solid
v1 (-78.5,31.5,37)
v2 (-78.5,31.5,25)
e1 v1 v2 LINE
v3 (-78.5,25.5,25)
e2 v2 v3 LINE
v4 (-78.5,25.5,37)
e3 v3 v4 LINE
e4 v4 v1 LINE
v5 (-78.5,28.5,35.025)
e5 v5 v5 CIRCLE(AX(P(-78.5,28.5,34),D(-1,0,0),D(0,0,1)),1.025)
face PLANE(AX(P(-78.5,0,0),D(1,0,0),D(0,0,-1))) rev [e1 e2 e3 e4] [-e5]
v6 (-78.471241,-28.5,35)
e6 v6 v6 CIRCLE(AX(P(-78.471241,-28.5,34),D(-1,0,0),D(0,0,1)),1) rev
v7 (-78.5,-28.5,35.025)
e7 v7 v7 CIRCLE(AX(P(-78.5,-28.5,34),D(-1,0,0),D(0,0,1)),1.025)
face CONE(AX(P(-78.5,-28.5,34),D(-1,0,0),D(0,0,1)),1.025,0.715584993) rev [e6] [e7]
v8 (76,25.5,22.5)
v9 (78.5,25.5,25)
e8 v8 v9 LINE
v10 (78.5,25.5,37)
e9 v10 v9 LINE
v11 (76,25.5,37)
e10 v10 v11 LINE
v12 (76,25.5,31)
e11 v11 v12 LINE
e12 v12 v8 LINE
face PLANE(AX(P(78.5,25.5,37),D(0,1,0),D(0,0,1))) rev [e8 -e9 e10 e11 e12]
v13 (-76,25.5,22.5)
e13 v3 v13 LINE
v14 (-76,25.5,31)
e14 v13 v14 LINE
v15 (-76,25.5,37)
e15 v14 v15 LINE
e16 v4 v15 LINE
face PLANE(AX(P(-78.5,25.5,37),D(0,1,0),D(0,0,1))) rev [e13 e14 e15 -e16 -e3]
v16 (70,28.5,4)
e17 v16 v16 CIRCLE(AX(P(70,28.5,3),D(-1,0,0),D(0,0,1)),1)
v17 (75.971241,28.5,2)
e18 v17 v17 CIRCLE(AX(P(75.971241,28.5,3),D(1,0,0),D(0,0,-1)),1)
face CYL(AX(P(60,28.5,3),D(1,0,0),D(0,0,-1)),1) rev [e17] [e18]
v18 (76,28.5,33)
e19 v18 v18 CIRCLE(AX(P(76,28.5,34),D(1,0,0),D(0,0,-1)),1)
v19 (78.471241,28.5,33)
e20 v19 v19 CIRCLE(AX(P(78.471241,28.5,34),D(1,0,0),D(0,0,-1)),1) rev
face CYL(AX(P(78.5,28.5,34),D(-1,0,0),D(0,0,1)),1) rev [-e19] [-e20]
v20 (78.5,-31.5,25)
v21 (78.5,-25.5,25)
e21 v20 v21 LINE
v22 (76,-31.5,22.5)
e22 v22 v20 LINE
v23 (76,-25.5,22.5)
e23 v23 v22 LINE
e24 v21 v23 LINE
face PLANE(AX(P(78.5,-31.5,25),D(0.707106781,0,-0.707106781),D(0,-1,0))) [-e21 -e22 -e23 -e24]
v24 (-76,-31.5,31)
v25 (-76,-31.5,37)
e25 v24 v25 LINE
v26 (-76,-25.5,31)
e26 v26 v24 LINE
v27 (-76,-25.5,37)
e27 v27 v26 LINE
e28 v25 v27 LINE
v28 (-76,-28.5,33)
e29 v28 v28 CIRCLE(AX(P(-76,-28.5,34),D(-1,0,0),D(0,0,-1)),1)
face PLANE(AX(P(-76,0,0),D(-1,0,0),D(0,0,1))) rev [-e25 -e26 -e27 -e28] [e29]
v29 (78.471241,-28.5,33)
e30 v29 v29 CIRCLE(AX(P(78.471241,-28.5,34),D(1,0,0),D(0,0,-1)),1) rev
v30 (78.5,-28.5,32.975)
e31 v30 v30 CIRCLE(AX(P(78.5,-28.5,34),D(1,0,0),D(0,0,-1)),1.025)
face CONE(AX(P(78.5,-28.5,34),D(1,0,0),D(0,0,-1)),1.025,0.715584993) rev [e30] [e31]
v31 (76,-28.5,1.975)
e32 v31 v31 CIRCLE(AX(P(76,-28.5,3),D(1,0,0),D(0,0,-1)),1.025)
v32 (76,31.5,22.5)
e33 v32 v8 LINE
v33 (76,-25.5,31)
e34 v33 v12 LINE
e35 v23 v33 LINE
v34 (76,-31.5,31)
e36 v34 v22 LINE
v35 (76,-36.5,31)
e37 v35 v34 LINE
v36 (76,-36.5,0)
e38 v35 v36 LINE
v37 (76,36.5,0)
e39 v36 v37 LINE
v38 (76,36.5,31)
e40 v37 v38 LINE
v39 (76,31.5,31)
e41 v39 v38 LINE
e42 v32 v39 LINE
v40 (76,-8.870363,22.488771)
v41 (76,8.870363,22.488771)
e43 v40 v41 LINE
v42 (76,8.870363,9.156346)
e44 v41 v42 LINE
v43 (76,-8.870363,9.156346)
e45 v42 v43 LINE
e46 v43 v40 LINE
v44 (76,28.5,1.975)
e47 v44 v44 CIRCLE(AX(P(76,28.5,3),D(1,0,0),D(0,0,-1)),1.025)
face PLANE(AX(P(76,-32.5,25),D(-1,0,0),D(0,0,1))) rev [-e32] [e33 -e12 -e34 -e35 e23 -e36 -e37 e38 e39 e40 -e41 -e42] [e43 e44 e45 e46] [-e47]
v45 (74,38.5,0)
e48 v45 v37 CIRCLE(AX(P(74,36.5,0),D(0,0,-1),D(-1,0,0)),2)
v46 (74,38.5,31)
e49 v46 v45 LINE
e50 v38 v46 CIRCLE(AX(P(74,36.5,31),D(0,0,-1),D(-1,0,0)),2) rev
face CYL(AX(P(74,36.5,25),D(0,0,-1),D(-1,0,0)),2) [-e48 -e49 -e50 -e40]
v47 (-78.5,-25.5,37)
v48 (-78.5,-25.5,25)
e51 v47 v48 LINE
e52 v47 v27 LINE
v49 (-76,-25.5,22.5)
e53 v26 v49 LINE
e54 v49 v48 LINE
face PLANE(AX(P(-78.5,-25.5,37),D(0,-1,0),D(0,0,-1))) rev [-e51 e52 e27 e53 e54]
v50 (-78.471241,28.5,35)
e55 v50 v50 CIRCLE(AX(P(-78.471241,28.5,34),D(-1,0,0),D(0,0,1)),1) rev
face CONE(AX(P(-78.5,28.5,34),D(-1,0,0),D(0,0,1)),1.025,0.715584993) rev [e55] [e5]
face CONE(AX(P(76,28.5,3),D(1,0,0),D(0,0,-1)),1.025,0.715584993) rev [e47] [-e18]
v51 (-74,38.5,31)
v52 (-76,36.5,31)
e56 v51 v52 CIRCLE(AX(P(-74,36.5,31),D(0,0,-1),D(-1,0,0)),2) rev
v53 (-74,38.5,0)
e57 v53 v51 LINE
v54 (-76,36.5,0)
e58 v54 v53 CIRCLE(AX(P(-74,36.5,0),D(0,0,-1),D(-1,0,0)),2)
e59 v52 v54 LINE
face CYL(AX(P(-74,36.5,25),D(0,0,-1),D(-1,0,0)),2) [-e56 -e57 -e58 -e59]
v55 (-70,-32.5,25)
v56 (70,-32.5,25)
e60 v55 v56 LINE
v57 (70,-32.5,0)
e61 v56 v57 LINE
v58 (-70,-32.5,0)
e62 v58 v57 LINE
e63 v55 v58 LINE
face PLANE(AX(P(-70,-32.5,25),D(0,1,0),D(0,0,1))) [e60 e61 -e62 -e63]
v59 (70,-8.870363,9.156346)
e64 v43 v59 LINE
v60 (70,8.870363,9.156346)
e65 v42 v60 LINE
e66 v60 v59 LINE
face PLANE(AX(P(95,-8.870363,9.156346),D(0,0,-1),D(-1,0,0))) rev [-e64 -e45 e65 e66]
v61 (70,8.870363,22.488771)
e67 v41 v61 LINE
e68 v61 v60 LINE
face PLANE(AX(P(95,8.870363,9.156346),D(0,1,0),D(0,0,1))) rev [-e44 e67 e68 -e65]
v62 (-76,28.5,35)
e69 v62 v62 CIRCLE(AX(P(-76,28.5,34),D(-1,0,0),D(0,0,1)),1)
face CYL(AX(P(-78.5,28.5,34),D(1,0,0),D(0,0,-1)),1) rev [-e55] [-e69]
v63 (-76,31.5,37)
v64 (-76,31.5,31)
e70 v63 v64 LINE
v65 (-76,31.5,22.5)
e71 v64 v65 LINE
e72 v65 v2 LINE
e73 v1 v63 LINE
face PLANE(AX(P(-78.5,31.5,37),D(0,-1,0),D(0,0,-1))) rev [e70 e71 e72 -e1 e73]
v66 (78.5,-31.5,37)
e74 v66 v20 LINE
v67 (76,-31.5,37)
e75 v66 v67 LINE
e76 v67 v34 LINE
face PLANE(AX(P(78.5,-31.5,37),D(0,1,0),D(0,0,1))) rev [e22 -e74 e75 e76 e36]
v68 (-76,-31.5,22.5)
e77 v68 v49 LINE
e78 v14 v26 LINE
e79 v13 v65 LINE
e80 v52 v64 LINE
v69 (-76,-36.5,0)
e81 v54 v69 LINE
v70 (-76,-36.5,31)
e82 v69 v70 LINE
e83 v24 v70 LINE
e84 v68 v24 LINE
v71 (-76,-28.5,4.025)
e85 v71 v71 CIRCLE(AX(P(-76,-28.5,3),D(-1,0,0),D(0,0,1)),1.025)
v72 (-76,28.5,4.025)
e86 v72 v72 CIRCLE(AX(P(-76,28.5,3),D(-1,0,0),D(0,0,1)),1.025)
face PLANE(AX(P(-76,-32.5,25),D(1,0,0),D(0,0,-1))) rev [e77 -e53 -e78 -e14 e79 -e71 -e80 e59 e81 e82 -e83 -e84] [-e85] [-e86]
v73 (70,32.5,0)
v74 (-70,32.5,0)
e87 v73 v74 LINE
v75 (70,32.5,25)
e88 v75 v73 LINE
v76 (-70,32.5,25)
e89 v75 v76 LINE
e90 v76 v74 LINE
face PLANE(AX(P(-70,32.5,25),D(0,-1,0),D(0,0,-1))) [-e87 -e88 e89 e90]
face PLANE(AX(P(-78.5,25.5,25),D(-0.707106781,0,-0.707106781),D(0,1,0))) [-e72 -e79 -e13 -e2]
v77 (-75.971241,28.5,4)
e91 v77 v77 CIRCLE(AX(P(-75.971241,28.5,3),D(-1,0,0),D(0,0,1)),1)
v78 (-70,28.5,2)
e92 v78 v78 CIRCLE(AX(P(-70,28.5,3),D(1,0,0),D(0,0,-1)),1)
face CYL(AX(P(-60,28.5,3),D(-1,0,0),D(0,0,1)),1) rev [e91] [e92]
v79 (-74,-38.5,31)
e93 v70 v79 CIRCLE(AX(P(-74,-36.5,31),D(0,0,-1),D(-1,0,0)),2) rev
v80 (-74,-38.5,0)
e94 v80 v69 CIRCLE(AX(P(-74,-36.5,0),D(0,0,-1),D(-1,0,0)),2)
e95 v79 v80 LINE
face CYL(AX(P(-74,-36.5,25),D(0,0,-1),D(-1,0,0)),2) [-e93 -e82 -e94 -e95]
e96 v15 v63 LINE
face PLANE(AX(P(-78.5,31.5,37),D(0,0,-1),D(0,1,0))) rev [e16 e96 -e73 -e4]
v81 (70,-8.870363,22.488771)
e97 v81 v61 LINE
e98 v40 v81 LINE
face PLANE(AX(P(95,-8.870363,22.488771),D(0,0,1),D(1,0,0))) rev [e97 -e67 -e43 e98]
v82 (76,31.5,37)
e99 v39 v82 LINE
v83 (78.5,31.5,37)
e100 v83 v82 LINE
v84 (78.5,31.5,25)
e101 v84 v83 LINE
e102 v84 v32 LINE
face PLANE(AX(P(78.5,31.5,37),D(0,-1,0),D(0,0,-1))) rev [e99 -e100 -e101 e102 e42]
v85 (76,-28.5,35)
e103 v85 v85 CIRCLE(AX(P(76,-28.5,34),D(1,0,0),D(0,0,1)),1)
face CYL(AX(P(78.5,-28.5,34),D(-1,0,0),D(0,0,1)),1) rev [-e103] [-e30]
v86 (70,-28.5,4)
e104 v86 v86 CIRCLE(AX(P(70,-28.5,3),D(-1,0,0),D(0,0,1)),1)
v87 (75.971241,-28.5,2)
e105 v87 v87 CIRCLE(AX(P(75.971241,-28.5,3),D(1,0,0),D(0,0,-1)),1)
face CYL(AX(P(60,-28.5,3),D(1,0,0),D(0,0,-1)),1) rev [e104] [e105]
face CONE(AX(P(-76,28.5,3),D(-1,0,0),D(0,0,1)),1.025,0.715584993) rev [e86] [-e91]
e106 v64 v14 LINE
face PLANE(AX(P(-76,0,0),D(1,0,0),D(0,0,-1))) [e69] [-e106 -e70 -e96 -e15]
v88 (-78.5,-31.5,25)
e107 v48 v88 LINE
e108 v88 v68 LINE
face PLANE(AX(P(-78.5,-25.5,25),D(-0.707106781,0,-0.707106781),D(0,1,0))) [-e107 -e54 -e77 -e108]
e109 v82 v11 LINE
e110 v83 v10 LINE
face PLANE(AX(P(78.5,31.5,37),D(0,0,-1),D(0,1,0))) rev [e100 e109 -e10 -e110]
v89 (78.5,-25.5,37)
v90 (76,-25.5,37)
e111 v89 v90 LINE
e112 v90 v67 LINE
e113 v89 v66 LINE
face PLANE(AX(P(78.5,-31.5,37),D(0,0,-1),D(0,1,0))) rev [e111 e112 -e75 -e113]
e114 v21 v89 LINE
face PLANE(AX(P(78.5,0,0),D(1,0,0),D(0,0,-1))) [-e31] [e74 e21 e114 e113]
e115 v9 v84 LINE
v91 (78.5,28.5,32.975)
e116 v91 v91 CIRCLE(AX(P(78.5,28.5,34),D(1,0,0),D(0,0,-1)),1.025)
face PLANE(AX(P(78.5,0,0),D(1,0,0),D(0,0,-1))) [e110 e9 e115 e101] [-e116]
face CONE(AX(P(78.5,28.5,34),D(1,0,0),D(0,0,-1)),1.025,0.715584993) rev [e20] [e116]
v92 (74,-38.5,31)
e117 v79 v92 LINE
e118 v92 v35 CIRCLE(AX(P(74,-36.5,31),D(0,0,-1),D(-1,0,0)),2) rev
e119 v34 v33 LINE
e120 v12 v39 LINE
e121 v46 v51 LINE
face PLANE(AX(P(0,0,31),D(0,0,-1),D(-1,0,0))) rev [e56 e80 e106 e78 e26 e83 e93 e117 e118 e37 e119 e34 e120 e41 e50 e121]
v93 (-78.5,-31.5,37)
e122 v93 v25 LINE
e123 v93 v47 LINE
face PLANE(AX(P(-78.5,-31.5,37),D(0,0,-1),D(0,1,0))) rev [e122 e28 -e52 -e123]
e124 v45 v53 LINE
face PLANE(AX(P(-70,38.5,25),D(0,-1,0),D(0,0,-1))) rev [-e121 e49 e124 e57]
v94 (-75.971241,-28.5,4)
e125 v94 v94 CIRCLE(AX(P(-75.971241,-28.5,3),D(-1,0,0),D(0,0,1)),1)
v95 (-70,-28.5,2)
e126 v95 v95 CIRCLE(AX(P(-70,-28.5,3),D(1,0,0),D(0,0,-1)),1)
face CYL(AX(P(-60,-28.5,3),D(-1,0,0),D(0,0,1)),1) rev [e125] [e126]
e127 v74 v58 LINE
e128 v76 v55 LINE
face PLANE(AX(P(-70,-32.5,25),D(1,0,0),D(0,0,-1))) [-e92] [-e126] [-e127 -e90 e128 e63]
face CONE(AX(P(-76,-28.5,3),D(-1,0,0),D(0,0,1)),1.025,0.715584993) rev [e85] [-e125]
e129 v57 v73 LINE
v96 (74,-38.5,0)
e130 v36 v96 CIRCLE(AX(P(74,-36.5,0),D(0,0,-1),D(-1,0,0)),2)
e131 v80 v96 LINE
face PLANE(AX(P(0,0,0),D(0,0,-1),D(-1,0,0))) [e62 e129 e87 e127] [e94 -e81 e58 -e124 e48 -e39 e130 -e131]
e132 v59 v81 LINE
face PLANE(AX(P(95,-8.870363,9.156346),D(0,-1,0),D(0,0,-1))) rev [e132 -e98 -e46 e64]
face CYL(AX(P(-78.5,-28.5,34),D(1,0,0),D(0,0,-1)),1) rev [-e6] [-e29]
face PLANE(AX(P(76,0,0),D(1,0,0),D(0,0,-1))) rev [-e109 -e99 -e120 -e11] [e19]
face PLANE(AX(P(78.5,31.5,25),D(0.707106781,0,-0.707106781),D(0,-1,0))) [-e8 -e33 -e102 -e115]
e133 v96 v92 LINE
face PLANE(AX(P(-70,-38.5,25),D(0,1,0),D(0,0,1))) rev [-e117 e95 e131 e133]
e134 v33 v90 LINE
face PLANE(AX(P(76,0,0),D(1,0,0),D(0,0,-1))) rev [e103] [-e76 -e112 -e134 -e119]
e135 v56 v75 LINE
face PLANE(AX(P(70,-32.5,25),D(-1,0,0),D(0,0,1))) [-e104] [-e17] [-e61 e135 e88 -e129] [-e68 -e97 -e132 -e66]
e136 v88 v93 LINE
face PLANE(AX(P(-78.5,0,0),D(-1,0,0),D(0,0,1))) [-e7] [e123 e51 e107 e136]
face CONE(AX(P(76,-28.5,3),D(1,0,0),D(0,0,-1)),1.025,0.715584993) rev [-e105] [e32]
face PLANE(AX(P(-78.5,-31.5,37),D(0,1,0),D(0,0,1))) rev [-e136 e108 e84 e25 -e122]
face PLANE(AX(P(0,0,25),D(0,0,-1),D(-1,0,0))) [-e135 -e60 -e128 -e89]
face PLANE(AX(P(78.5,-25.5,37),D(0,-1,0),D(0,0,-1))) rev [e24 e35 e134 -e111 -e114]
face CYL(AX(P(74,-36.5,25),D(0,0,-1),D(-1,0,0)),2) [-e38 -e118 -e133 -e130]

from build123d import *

# Parameters (mm, degrees)
IZIM1_W                     = 140
IZIM1_H                     = 65
Y_KSEKLIK_EKSTR_ZYON1_DEPTH = 25
BO_ALTMA3_T                 = 6
IZIM2_R                     = 2.25
KES_EKSTR_ZYON1_DEPTH       = 25
IZIM3_W                     = 13.33242511
IZIM3_H                     = 17.74072696
KES_EKSTR_ZYON2_DEPTH       = 25
RADYUS1_R                   = 2
IZIM2_2_R                   = 2.25
Y_KSEKLIK_EKSTR_ZYON2_DEPTH = 56
IZIM4_W                     = 373.647540747
IZIM4_H                     = 192.392001967
KES_EKSTR_ZYON3_DEPTH       = 1
IZIM5_R                     = 2.25
KES_EKSTR_ZYON4_DEPTH       = 25
IZIM6_W                     = 175.161164464
IZIM6_H                     = 86.760539326
KES_EKSTR_ZYON5_DEPTH       = 37
IZIM7_R                     = 2.25
Y_KSEKLIK_EKSTR_ZYON3_DEPTH = 30
IZIM8_R                     = 1
KES_EKSTR_ZYON6_DEPTH       = 16
KES_EKSTR_ZYON7_START       = -16
IZIM9_R                     = 1
KES_EKSTR_ZYON7_DEPTH       = 16
M2_DI_LI_DELIK2_D           = 1.6
M2_DI_LI_DELIK2_CSINK_D     = 2.05
M2_DI_LI_DELIK2_CSINK_ANGLE = 82
M2_DI_LI_DELIK3_D           = 1.6
M2_DI_LI_DELIK3_CSINK_D     = 2.05
M2_DI_LI_DELIK3_CSINK_ANGLE = 82
IZIM16_W                    = 12
IZIM16_H                    = 6
IZIM16_R                    = 1
Y_KSEKLIK_EKSTR_ZYON4_DEPTH = 2.5
Y_KSEKLIK_EKSTR_ZYON5_START = 2.5
IZIM17_W                    = 12
IZIM17_H                    = 6
IZIM17_R                    = 1
Y_KSEKLIK_EKSTR_ZYON5_DEPTH = 2.5
PAH1_SIZE                   = 2.5


# Read off the part's stored shape, not the designer's step: M2 Dişli Delik4
with BuildPart() as part:
    # Çizim1 → Yükseklik-Ekstrüzyon1 (new body)
    with BuildSketch(Plane.XY):
        Rectangle(IZIM1_W, IZIM1_H)
    extrude(amount=Y_KSEKLIK_EKSTR_ZYON1_DEPTH)

    # İç Boşaltma3
    bo_altma3_openings = [part.faces().sort_by_distance(p)[0] for p in [
        (0, 0, 0),
    ]]
    offset(amount=BO_ALTMA3_T, openings=bo_altma3_openings, kind=Kind.INTERSECTION)

    # Çizim2 → Kes-Ekstrüzyon1 (cut)
    with BuildSketch(Plane(origin=(0, 0, 0), x_dir=(-1, 0, 0), z_dir=(0, 0, -1))):
        with Locations((-73, -35.5)):
            Circle(IZIM2_R)
        with Locations(Location((73, -35.5, 0), (0, 0, 180))):
            Circle(IZIM2_R)
        with Locations(Location((-73, 35.5, 0), (0, 0, 180))):
            Circle(IZIM2_R)
        with Locations((73, 35.5)):
            Circle(IZIM2_R)
    extrude(amount=-KES_EKSTR_ZYON1_DEPTH, mode=Mode.SUBTRACT)

    # Çizim3 → Kes-Ekstrüzyon2 (cut)
    with BuildSketch(Plane.ZY.offset(-70)):
        with Locations((15.822558672, 0)):
            Rectangle(IZIM3_W, IZIM3_H)
    extrude(amount=-KES_EKSTR_ZYON2_DEPTH, mode=Mode.SUBTRACT)

    # Radyus1
    radyus1_edges = [part.edges().sort_by_distance(p)[0] for p in [
        (76, -38.5, 15.5),
        (-76, -38.5, 15.5),
        (-76, 38.5, 15.5),
        (76, 38.5, 15.5),
    ]]
    fillet(radyus1_edges, radius=RADYUS1_R)

    # Çizim2<2> → Yükseklik-Ekstrüzyon2 (add)
    with BuildSketch(Plane(origin=(0, 0, 0), x_dir=(-1, 0, 0), z_dir=(0, 0, -1))):
        with Locations((-73, -35.5)):
            Circle(IZIM2_2_R)
        with Locations((73, -35.5)):
            Circle(IZIM2_2_R)
        with Locations((-73, 35.5)):
            Circle(IZIM2_2_R)
        with Locations((73, 35.5)):
            Circle(IZIM2_2_R)
    extrude(amount=-Y_KSEKLIK_EKSTR_ZYON2_DEPTH)

    # Çizim4 → Kes-Ekstrüzyon3 (cut)
    with BuildSketch(Plane.XY.offset(56)):
        with Locations((-92.221826013, 44.195860188)):
            Rectangle(IZIM4_W, IZIM4_H)
    extrude(amount=-KES_EKSTR_ZYON3_DEPTH, mode=Mode.SUBTRACT)

    # Çizim5 → Kes-Ekstrüzyon4 (cut)
    with BuildSketch(Plane(origin=(0, 0, 0), x_dir=(-1, 0, 0), z_dir=(0, 0, -1))):
        with Locations((-73, -35.527793561)):
            Circle(IZIM5_R)
        with Locations(Location((-73, 35.527793561, 0), (0, 0, 180))):
            Circle(IZIM5_R)
        with Locations((73, 35.527793561)):
            Circle(IZIM5_R)
        with Locations(Location((73, -35.527793561, 0), (0, 0, 180))):
            Circle(IZIM5_R)
    extrude(amount=-KES_EKSTR_ZYON4_DEPTH, mode=Mode.SUBTRACT)

    # Çizim6 → Kes-Ekstrüzyon5 (cut)
    with BuildSketch(Plane.XY.offset(31)):
        Rectangle(IZIM6_W, IZIM6_H)
    extrude(amount=KES_EKSTR_ZYON5_DEPTH, mode=Mode.SUBTRACT)

    # Çizim7 → Yükseklik-Ekstrüzyon3 (add)
    with BuildSketch(Plane(origin=(0, 0, 0), x_dir=(-1, 0, 0), z_dir=(0, 0, -1))):
        with Locations((-73, 35.527793561)):
            Circle(IZIM7_R)
        with Locations((-73, -35.527793561)):
            Circle(IZIM7_R)
        with Locations((73, -35.527793561)):
            Circle(IZIM7_R)
        with Locations((73, 35.527793561)):
            Circle(IZIM7_R)
    extrude(amount=-Y_KSEKLIK_EKSTR_ZYON3_DEPTH)

    # Çizim8 → Kes-Ekstrüzyon6 (cut)
    with BuildSketch(Plane(origin=(76, 0, 0), x_dir=(0, 0, -1), z_dir=(1, 0, 0))):
        with Locations((-3, 28.5)):
            Circle(IZIM8_R)
        with Locations(Location((-3, -28.5, 0), (0, 0, 180))):
            Circle(IZIM8_R)
    extrude(amount=-KES_EKSTR_ZYON6_DEPTH, mode=Mode.SUBTRACT)

    # Çizim9 → Kes-Ekstrüzyon7 (cut)
    with BuildSketch(Plane.ZY.offset(76).offset(KES_EKSTR_ZYON7_START)):
        with Locations(Location((3, 28.5, 0), (0, 0, 180))):
            Circle(IZIM9_R)
        with Locations((3, -28.5)):
            Circle(IZIM9_R)
    extrude(amount=KES_EKSTR_ZYON7_DEPTH, mode=Mode.SUBTRACT)

    # M2 Dişli Delik2 (through all)
    with Locations(Plane(origin=(-76, 28.5, 3), x_dir=(0, 0, -1), z_dir=(-1, 0, 0))):
        with Locations((0, 0), (0, 57)):
            CounterSinkHole(M2_DI_LI_DELIK2_D / 2, M2_DI_LI_DELIK2_CSINK_D / 2, counter_sink_angle=M2_DI_LI_DELIK2_CSINK_ANGLE)

    # M2 Dişli Delik3 (through all)
    with Locations(Plane(origin=(76, 28.5, 3), x_dir=(0, 0, 1), z_dir=(1, 0, 0))):
        with Locations((0, 0), (0, 57)):
            CounterSinkHole(M2_DI_LI_DELIK3_D / 2, M2_DI_LI_DELIK3_CSINK_D / 2, counter_sink_angle=M2_DI_LI_DELIK3_CSINK_ANGLE)

    # Çizim16 → Yükseklik-Ekstrüzyon4 (add)
    # profile 1 of 2: a face of its own
    with BuildSketch(Plane(origin=(76, 0, 0), x_dir=(0, 0, -1), z_dir=(1, 0, 0))):
        with Locations((-31, 28.5)):
            Rectangle(IZIM16_W, IZIM16_H)
        with Locations((-34, 28.5)):
            Circle(IZIM16_R, mode=Mode.SUBTRACT)
    # profile 2 of 2: a face of its own
    with BuildSketch(Plane(origin=(76, 0, 0), x_dir=(0, 0, -1), z_dir=(1, 0, 0))):
        with Locations((-31, -28.5)):
            Rectangle(IZIM16_W, IZIM16_H)
        with Locations(Location((-34, -28.5, 0), (0, 0, 180))):
            Circle(IZIM16_R, mode=Mode.SUBTRACT)
    extrude(amount=Y_KSEKLIK_EKSTR_ZYON4_DEPTH)

    # Çizim17 → Yükseklik-Ekstrüzyon5 (add)
    # profile 1 of 2: a face of its own
    with BuildSketch(Plane.ZY.offset(76).offset(Y_KSEKLIK_EKSTR_ZYON5_START)):
        with Locations((31, 28.5)):
            Rectangle(IZIM17_W, IZIM17_H)
        with Locations(Location((34, 28.5, 0), (0, 0, 180))):
            Circle(IZIM17_R, mode=Mode.SUBTRACT)
    # profile 2 of 2: a face of its own
    with BuildSketch(Plane.ZY.offset(76).offset(Y_KSEKLIK_EKSTR_ZYON5_START)):
        with Locations((31, -28.5)):
            Rectangle(IZIM17_W, IZIM17_H)
        with Locations((34, -28.5)):
            Circle(IZIM17_R, mode=Mode.SUBTRACT)
    extrude(amount=-Y_KSEKLIK_EKSTR_ZYON5_DEPTH)

    # M2 Dişli Delik4 outline → M2 Dişli Delik4 (revolve, cut)
    with BuildSketch(Plane(origin=(0, 28.5, 34), x_dir=(0, 1, 0), z_dir=(0, 0, -1))):
        Polygon((1, 78.5), (1, 78.47124079), (1.025, 78.5), align=None)
        Polygon((1.025, -78.5), (1, -78.47124079), (1, -78.5), align=None)
    revolve(axis=Axis((0, 28.5, 34), (1, 0, 0)), mode=Mode.SUBTRACT)

    # M2 Di_li Delik4 2 outline → M2 Di_li Delik4 2 (revolve, cut)
    with BuildSketch(Plane(origin=(0, -28.5, 34), x_dir=(0, 1, 0), z_dir=(0, 0, -1))):
        Polygon((1, 78.5), (1, 78.47124079), (1.025, 78.5), align=None)
        Polygon((1.025, -78.5), (1, -78.47124079), (1, -78.5), align=None)
    revolve(axis=Axis((0, -28.5, 34), (1, 0, 0)), mode=Mode.SUBTRACT)

    # Pah1
    pah1_edges = [part.edges().sort_by_distance(p)[0] for p in [
        (76, -28.5, 25),
        (76, 28.5, 25),
        (-76, 28.5, 25),
        (-76, -28.5, 25),
    ]]
    chamfer(pah1_edges, length=PAH1_SIZE - 0.0001)  # a hair under: the kernel refuses the full size


solid = part.part
